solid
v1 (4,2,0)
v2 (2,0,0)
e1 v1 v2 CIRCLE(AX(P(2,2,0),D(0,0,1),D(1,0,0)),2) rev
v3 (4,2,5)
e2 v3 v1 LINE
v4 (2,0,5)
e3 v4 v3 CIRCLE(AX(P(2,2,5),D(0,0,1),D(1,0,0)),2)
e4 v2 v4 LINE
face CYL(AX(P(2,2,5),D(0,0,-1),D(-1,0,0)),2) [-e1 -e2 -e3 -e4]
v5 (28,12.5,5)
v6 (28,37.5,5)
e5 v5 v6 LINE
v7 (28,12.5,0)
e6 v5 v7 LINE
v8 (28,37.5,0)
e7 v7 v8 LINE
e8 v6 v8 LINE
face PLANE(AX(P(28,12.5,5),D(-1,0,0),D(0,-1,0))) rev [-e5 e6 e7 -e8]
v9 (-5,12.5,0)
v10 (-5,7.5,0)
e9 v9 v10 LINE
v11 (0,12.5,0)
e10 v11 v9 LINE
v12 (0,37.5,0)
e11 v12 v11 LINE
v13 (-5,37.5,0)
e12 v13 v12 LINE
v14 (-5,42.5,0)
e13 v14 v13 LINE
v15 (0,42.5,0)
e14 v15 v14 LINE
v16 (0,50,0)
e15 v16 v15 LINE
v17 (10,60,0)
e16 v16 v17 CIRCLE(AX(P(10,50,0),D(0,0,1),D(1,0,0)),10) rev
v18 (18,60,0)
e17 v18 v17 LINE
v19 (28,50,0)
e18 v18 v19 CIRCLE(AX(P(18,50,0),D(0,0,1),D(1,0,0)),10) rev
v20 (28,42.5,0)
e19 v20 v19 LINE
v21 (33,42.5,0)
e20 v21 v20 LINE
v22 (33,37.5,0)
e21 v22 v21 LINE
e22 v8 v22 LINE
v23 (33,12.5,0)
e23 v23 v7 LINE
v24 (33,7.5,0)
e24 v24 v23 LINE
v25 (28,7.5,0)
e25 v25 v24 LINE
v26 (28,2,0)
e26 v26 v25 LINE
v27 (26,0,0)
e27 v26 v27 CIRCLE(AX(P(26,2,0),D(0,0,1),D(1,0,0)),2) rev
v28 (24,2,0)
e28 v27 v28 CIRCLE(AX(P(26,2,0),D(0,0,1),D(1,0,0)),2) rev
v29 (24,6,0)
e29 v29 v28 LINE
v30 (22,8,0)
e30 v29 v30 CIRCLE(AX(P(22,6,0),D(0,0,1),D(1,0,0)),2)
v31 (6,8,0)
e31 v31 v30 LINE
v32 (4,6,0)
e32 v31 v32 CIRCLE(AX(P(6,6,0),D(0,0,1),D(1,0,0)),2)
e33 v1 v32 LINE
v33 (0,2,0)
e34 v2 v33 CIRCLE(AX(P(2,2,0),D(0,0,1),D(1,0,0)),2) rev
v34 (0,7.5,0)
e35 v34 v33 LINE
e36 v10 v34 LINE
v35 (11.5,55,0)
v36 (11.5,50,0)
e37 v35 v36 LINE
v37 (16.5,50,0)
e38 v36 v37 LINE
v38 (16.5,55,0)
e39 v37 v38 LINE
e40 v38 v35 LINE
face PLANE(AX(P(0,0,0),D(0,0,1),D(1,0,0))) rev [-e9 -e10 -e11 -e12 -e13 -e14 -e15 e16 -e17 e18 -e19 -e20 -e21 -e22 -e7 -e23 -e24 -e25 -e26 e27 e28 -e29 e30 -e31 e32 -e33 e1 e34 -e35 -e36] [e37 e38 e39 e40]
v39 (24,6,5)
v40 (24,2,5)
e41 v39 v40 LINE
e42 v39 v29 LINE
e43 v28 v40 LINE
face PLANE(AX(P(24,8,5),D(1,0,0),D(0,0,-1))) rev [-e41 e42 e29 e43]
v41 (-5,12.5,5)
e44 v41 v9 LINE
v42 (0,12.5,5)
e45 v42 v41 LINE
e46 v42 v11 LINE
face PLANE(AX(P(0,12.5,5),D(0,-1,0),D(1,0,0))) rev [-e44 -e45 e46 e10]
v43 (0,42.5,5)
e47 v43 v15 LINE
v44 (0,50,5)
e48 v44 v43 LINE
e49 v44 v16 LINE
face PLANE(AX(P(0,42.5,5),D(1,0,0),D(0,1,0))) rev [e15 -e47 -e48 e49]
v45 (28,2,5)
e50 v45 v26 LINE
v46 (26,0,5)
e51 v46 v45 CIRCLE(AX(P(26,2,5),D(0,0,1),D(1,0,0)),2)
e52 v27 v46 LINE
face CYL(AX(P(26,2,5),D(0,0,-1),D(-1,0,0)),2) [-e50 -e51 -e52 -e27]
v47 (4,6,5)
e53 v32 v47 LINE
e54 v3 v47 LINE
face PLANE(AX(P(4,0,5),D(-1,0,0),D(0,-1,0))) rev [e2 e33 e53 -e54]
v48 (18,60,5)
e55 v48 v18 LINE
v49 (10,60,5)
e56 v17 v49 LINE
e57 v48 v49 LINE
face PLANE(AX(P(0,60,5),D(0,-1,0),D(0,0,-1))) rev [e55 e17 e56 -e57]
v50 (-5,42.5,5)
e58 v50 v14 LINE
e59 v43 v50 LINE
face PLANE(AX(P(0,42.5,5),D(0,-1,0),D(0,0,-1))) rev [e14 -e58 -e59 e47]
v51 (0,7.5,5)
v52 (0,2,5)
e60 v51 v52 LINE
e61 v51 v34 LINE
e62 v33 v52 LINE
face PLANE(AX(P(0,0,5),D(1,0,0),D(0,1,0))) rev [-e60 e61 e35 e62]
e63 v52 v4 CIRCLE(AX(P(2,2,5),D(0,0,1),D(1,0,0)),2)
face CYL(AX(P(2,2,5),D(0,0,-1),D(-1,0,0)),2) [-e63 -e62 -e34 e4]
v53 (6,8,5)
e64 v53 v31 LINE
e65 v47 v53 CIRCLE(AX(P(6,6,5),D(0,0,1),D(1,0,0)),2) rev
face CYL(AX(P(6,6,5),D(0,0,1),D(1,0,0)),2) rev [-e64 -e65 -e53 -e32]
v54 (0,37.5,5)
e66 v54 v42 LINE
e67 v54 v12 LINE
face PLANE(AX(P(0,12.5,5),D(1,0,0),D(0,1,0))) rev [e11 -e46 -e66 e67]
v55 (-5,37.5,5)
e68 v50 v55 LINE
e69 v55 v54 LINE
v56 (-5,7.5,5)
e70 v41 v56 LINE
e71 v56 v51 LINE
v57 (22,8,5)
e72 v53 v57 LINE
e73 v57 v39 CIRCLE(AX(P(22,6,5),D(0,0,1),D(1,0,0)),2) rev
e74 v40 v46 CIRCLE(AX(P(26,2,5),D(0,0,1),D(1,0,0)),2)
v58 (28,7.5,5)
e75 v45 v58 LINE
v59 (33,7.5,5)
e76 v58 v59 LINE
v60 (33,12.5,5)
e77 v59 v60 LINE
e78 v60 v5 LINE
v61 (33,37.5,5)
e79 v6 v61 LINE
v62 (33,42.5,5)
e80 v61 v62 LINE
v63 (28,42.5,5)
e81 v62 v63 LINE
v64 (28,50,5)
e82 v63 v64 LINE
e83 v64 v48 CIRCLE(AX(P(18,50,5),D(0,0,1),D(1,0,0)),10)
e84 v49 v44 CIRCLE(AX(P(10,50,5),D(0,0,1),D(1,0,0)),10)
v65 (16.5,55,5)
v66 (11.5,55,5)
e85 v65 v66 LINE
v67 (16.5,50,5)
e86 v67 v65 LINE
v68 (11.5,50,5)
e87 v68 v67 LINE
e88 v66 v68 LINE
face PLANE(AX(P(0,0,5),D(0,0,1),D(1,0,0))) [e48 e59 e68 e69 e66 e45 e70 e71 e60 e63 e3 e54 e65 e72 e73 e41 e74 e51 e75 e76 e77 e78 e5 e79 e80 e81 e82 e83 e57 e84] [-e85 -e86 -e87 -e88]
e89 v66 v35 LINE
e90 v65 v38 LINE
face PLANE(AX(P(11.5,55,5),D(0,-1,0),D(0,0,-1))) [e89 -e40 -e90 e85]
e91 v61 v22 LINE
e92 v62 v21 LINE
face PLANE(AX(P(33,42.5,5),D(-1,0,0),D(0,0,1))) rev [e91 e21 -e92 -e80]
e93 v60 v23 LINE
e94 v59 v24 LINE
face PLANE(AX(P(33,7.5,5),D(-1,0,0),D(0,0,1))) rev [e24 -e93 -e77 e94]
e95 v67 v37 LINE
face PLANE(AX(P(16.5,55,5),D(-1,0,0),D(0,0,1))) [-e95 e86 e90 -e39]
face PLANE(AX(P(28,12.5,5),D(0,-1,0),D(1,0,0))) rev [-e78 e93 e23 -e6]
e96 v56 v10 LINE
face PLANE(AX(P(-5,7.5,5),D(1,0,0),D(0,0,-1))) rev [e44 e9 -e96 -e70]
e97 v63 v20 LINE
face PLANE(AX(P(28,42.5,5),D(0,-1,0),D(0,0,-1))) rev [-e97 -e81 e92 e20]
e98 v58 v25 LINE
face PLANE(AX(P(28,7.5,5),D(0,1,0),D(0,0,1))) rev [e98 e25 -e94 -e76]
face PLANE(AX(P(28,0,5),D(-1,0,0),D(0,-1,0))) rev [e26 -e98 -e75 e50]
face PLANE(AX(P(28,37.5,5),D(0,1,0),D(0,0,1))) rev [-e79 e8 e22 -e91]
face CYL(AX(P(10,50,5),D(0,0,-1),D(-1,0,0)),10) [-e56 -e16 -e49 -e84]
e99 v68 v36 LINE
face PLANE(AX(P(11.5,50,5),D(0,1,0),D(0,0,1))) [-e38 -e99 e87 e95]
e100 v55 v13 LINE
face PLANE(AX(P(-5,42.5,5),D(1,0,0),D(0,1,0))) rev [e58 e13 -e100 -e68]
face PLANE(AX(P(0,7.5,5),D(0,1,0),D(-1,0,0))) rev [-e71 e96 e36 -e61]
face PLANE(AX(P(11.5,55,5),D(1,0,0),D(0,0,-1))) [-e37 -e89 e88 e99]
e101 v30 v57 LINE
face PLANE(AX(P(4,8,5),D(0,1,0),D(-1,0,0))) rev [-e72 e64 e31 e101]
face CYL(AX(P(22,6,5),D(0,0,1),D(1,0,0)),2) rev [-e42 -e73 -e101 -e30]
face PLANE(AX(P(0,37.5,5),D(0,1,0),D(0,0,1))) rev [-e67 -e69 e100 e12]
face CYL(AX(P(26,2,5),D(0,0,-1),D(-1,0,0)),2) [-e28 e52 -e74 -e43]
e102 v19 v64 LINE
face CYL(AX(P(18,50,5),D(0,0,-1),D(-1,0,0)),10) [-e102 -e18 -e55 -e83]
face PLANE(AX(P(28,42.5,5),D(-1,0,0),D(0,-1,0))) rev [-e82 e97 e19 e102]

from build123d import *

# Parameters (mm, degrees)
ESQUISSE1_W        = 5
ESQUISSE1_H        = 5
BOSS_EXTRU_1_DEPTH = 5
CONG_1_R           = 2
CONG_2_R           = 2
CONG_3_R           = 10


with BuildPart() as part:
    # Esquisse1 → Boss.-Extru.1 (new body)
    with BuildSketch(Plane.XY):
        Polygon((0, 0), (4, 0), (4, 8), (24, 8), (24, 0), (28, 0), (28, 7.5), (33, 7.5), (33, 12.5), (28, 12.5), (28, 37.5), (33, 37.5), (33, 42.5), (28, 42.5), (28, 60), (0, 60), (0, 42.5), (-5, 42.5), (-5, 37.5), (0, 37.5), (0, 12.5), (-5, 12.5), (-5, 7.5), (0, 7.5), align=None)
        with Locations((14, 52.5)):
            Rectangle(ESQUISSE1_W, ESQUISSE1_H, mode=Mode.SUBTRACT)
    extrude(amount=BOSS_EXTRU_1_DEPTH)

    # Congé1
    cong_1_edges = [part.edges().sort_by_distance(p)[0] for p in [
        (24, 8, 2.5),
        (4, 8, 2.5),
    ]]
    fillet(cong_1_edges, radius=CONG_1_R)

    # Congé2
    cong_2_edges = [part.edges().sort_by_distance(p)[0] for p in [
        (24, 0, 2.5),
        (28, 0, 2.5),
        (0, 0, 2.5),
        (4, 0, 2.5),
    ]]
    fillet(cong_2_edges, radius=CONG_2_R - 0.0001)  # a hair under: the kernel refuses the full size

    # Congé3
    cong_3_edges = [part.edges().sort_by_distance(p)[0] for p in [
        (0, 60, 2.5),
        (28, 60, 2.5),
    ]]
    fillet(cong_3_edges, radius=CONG_3_R)


solid = part.part
